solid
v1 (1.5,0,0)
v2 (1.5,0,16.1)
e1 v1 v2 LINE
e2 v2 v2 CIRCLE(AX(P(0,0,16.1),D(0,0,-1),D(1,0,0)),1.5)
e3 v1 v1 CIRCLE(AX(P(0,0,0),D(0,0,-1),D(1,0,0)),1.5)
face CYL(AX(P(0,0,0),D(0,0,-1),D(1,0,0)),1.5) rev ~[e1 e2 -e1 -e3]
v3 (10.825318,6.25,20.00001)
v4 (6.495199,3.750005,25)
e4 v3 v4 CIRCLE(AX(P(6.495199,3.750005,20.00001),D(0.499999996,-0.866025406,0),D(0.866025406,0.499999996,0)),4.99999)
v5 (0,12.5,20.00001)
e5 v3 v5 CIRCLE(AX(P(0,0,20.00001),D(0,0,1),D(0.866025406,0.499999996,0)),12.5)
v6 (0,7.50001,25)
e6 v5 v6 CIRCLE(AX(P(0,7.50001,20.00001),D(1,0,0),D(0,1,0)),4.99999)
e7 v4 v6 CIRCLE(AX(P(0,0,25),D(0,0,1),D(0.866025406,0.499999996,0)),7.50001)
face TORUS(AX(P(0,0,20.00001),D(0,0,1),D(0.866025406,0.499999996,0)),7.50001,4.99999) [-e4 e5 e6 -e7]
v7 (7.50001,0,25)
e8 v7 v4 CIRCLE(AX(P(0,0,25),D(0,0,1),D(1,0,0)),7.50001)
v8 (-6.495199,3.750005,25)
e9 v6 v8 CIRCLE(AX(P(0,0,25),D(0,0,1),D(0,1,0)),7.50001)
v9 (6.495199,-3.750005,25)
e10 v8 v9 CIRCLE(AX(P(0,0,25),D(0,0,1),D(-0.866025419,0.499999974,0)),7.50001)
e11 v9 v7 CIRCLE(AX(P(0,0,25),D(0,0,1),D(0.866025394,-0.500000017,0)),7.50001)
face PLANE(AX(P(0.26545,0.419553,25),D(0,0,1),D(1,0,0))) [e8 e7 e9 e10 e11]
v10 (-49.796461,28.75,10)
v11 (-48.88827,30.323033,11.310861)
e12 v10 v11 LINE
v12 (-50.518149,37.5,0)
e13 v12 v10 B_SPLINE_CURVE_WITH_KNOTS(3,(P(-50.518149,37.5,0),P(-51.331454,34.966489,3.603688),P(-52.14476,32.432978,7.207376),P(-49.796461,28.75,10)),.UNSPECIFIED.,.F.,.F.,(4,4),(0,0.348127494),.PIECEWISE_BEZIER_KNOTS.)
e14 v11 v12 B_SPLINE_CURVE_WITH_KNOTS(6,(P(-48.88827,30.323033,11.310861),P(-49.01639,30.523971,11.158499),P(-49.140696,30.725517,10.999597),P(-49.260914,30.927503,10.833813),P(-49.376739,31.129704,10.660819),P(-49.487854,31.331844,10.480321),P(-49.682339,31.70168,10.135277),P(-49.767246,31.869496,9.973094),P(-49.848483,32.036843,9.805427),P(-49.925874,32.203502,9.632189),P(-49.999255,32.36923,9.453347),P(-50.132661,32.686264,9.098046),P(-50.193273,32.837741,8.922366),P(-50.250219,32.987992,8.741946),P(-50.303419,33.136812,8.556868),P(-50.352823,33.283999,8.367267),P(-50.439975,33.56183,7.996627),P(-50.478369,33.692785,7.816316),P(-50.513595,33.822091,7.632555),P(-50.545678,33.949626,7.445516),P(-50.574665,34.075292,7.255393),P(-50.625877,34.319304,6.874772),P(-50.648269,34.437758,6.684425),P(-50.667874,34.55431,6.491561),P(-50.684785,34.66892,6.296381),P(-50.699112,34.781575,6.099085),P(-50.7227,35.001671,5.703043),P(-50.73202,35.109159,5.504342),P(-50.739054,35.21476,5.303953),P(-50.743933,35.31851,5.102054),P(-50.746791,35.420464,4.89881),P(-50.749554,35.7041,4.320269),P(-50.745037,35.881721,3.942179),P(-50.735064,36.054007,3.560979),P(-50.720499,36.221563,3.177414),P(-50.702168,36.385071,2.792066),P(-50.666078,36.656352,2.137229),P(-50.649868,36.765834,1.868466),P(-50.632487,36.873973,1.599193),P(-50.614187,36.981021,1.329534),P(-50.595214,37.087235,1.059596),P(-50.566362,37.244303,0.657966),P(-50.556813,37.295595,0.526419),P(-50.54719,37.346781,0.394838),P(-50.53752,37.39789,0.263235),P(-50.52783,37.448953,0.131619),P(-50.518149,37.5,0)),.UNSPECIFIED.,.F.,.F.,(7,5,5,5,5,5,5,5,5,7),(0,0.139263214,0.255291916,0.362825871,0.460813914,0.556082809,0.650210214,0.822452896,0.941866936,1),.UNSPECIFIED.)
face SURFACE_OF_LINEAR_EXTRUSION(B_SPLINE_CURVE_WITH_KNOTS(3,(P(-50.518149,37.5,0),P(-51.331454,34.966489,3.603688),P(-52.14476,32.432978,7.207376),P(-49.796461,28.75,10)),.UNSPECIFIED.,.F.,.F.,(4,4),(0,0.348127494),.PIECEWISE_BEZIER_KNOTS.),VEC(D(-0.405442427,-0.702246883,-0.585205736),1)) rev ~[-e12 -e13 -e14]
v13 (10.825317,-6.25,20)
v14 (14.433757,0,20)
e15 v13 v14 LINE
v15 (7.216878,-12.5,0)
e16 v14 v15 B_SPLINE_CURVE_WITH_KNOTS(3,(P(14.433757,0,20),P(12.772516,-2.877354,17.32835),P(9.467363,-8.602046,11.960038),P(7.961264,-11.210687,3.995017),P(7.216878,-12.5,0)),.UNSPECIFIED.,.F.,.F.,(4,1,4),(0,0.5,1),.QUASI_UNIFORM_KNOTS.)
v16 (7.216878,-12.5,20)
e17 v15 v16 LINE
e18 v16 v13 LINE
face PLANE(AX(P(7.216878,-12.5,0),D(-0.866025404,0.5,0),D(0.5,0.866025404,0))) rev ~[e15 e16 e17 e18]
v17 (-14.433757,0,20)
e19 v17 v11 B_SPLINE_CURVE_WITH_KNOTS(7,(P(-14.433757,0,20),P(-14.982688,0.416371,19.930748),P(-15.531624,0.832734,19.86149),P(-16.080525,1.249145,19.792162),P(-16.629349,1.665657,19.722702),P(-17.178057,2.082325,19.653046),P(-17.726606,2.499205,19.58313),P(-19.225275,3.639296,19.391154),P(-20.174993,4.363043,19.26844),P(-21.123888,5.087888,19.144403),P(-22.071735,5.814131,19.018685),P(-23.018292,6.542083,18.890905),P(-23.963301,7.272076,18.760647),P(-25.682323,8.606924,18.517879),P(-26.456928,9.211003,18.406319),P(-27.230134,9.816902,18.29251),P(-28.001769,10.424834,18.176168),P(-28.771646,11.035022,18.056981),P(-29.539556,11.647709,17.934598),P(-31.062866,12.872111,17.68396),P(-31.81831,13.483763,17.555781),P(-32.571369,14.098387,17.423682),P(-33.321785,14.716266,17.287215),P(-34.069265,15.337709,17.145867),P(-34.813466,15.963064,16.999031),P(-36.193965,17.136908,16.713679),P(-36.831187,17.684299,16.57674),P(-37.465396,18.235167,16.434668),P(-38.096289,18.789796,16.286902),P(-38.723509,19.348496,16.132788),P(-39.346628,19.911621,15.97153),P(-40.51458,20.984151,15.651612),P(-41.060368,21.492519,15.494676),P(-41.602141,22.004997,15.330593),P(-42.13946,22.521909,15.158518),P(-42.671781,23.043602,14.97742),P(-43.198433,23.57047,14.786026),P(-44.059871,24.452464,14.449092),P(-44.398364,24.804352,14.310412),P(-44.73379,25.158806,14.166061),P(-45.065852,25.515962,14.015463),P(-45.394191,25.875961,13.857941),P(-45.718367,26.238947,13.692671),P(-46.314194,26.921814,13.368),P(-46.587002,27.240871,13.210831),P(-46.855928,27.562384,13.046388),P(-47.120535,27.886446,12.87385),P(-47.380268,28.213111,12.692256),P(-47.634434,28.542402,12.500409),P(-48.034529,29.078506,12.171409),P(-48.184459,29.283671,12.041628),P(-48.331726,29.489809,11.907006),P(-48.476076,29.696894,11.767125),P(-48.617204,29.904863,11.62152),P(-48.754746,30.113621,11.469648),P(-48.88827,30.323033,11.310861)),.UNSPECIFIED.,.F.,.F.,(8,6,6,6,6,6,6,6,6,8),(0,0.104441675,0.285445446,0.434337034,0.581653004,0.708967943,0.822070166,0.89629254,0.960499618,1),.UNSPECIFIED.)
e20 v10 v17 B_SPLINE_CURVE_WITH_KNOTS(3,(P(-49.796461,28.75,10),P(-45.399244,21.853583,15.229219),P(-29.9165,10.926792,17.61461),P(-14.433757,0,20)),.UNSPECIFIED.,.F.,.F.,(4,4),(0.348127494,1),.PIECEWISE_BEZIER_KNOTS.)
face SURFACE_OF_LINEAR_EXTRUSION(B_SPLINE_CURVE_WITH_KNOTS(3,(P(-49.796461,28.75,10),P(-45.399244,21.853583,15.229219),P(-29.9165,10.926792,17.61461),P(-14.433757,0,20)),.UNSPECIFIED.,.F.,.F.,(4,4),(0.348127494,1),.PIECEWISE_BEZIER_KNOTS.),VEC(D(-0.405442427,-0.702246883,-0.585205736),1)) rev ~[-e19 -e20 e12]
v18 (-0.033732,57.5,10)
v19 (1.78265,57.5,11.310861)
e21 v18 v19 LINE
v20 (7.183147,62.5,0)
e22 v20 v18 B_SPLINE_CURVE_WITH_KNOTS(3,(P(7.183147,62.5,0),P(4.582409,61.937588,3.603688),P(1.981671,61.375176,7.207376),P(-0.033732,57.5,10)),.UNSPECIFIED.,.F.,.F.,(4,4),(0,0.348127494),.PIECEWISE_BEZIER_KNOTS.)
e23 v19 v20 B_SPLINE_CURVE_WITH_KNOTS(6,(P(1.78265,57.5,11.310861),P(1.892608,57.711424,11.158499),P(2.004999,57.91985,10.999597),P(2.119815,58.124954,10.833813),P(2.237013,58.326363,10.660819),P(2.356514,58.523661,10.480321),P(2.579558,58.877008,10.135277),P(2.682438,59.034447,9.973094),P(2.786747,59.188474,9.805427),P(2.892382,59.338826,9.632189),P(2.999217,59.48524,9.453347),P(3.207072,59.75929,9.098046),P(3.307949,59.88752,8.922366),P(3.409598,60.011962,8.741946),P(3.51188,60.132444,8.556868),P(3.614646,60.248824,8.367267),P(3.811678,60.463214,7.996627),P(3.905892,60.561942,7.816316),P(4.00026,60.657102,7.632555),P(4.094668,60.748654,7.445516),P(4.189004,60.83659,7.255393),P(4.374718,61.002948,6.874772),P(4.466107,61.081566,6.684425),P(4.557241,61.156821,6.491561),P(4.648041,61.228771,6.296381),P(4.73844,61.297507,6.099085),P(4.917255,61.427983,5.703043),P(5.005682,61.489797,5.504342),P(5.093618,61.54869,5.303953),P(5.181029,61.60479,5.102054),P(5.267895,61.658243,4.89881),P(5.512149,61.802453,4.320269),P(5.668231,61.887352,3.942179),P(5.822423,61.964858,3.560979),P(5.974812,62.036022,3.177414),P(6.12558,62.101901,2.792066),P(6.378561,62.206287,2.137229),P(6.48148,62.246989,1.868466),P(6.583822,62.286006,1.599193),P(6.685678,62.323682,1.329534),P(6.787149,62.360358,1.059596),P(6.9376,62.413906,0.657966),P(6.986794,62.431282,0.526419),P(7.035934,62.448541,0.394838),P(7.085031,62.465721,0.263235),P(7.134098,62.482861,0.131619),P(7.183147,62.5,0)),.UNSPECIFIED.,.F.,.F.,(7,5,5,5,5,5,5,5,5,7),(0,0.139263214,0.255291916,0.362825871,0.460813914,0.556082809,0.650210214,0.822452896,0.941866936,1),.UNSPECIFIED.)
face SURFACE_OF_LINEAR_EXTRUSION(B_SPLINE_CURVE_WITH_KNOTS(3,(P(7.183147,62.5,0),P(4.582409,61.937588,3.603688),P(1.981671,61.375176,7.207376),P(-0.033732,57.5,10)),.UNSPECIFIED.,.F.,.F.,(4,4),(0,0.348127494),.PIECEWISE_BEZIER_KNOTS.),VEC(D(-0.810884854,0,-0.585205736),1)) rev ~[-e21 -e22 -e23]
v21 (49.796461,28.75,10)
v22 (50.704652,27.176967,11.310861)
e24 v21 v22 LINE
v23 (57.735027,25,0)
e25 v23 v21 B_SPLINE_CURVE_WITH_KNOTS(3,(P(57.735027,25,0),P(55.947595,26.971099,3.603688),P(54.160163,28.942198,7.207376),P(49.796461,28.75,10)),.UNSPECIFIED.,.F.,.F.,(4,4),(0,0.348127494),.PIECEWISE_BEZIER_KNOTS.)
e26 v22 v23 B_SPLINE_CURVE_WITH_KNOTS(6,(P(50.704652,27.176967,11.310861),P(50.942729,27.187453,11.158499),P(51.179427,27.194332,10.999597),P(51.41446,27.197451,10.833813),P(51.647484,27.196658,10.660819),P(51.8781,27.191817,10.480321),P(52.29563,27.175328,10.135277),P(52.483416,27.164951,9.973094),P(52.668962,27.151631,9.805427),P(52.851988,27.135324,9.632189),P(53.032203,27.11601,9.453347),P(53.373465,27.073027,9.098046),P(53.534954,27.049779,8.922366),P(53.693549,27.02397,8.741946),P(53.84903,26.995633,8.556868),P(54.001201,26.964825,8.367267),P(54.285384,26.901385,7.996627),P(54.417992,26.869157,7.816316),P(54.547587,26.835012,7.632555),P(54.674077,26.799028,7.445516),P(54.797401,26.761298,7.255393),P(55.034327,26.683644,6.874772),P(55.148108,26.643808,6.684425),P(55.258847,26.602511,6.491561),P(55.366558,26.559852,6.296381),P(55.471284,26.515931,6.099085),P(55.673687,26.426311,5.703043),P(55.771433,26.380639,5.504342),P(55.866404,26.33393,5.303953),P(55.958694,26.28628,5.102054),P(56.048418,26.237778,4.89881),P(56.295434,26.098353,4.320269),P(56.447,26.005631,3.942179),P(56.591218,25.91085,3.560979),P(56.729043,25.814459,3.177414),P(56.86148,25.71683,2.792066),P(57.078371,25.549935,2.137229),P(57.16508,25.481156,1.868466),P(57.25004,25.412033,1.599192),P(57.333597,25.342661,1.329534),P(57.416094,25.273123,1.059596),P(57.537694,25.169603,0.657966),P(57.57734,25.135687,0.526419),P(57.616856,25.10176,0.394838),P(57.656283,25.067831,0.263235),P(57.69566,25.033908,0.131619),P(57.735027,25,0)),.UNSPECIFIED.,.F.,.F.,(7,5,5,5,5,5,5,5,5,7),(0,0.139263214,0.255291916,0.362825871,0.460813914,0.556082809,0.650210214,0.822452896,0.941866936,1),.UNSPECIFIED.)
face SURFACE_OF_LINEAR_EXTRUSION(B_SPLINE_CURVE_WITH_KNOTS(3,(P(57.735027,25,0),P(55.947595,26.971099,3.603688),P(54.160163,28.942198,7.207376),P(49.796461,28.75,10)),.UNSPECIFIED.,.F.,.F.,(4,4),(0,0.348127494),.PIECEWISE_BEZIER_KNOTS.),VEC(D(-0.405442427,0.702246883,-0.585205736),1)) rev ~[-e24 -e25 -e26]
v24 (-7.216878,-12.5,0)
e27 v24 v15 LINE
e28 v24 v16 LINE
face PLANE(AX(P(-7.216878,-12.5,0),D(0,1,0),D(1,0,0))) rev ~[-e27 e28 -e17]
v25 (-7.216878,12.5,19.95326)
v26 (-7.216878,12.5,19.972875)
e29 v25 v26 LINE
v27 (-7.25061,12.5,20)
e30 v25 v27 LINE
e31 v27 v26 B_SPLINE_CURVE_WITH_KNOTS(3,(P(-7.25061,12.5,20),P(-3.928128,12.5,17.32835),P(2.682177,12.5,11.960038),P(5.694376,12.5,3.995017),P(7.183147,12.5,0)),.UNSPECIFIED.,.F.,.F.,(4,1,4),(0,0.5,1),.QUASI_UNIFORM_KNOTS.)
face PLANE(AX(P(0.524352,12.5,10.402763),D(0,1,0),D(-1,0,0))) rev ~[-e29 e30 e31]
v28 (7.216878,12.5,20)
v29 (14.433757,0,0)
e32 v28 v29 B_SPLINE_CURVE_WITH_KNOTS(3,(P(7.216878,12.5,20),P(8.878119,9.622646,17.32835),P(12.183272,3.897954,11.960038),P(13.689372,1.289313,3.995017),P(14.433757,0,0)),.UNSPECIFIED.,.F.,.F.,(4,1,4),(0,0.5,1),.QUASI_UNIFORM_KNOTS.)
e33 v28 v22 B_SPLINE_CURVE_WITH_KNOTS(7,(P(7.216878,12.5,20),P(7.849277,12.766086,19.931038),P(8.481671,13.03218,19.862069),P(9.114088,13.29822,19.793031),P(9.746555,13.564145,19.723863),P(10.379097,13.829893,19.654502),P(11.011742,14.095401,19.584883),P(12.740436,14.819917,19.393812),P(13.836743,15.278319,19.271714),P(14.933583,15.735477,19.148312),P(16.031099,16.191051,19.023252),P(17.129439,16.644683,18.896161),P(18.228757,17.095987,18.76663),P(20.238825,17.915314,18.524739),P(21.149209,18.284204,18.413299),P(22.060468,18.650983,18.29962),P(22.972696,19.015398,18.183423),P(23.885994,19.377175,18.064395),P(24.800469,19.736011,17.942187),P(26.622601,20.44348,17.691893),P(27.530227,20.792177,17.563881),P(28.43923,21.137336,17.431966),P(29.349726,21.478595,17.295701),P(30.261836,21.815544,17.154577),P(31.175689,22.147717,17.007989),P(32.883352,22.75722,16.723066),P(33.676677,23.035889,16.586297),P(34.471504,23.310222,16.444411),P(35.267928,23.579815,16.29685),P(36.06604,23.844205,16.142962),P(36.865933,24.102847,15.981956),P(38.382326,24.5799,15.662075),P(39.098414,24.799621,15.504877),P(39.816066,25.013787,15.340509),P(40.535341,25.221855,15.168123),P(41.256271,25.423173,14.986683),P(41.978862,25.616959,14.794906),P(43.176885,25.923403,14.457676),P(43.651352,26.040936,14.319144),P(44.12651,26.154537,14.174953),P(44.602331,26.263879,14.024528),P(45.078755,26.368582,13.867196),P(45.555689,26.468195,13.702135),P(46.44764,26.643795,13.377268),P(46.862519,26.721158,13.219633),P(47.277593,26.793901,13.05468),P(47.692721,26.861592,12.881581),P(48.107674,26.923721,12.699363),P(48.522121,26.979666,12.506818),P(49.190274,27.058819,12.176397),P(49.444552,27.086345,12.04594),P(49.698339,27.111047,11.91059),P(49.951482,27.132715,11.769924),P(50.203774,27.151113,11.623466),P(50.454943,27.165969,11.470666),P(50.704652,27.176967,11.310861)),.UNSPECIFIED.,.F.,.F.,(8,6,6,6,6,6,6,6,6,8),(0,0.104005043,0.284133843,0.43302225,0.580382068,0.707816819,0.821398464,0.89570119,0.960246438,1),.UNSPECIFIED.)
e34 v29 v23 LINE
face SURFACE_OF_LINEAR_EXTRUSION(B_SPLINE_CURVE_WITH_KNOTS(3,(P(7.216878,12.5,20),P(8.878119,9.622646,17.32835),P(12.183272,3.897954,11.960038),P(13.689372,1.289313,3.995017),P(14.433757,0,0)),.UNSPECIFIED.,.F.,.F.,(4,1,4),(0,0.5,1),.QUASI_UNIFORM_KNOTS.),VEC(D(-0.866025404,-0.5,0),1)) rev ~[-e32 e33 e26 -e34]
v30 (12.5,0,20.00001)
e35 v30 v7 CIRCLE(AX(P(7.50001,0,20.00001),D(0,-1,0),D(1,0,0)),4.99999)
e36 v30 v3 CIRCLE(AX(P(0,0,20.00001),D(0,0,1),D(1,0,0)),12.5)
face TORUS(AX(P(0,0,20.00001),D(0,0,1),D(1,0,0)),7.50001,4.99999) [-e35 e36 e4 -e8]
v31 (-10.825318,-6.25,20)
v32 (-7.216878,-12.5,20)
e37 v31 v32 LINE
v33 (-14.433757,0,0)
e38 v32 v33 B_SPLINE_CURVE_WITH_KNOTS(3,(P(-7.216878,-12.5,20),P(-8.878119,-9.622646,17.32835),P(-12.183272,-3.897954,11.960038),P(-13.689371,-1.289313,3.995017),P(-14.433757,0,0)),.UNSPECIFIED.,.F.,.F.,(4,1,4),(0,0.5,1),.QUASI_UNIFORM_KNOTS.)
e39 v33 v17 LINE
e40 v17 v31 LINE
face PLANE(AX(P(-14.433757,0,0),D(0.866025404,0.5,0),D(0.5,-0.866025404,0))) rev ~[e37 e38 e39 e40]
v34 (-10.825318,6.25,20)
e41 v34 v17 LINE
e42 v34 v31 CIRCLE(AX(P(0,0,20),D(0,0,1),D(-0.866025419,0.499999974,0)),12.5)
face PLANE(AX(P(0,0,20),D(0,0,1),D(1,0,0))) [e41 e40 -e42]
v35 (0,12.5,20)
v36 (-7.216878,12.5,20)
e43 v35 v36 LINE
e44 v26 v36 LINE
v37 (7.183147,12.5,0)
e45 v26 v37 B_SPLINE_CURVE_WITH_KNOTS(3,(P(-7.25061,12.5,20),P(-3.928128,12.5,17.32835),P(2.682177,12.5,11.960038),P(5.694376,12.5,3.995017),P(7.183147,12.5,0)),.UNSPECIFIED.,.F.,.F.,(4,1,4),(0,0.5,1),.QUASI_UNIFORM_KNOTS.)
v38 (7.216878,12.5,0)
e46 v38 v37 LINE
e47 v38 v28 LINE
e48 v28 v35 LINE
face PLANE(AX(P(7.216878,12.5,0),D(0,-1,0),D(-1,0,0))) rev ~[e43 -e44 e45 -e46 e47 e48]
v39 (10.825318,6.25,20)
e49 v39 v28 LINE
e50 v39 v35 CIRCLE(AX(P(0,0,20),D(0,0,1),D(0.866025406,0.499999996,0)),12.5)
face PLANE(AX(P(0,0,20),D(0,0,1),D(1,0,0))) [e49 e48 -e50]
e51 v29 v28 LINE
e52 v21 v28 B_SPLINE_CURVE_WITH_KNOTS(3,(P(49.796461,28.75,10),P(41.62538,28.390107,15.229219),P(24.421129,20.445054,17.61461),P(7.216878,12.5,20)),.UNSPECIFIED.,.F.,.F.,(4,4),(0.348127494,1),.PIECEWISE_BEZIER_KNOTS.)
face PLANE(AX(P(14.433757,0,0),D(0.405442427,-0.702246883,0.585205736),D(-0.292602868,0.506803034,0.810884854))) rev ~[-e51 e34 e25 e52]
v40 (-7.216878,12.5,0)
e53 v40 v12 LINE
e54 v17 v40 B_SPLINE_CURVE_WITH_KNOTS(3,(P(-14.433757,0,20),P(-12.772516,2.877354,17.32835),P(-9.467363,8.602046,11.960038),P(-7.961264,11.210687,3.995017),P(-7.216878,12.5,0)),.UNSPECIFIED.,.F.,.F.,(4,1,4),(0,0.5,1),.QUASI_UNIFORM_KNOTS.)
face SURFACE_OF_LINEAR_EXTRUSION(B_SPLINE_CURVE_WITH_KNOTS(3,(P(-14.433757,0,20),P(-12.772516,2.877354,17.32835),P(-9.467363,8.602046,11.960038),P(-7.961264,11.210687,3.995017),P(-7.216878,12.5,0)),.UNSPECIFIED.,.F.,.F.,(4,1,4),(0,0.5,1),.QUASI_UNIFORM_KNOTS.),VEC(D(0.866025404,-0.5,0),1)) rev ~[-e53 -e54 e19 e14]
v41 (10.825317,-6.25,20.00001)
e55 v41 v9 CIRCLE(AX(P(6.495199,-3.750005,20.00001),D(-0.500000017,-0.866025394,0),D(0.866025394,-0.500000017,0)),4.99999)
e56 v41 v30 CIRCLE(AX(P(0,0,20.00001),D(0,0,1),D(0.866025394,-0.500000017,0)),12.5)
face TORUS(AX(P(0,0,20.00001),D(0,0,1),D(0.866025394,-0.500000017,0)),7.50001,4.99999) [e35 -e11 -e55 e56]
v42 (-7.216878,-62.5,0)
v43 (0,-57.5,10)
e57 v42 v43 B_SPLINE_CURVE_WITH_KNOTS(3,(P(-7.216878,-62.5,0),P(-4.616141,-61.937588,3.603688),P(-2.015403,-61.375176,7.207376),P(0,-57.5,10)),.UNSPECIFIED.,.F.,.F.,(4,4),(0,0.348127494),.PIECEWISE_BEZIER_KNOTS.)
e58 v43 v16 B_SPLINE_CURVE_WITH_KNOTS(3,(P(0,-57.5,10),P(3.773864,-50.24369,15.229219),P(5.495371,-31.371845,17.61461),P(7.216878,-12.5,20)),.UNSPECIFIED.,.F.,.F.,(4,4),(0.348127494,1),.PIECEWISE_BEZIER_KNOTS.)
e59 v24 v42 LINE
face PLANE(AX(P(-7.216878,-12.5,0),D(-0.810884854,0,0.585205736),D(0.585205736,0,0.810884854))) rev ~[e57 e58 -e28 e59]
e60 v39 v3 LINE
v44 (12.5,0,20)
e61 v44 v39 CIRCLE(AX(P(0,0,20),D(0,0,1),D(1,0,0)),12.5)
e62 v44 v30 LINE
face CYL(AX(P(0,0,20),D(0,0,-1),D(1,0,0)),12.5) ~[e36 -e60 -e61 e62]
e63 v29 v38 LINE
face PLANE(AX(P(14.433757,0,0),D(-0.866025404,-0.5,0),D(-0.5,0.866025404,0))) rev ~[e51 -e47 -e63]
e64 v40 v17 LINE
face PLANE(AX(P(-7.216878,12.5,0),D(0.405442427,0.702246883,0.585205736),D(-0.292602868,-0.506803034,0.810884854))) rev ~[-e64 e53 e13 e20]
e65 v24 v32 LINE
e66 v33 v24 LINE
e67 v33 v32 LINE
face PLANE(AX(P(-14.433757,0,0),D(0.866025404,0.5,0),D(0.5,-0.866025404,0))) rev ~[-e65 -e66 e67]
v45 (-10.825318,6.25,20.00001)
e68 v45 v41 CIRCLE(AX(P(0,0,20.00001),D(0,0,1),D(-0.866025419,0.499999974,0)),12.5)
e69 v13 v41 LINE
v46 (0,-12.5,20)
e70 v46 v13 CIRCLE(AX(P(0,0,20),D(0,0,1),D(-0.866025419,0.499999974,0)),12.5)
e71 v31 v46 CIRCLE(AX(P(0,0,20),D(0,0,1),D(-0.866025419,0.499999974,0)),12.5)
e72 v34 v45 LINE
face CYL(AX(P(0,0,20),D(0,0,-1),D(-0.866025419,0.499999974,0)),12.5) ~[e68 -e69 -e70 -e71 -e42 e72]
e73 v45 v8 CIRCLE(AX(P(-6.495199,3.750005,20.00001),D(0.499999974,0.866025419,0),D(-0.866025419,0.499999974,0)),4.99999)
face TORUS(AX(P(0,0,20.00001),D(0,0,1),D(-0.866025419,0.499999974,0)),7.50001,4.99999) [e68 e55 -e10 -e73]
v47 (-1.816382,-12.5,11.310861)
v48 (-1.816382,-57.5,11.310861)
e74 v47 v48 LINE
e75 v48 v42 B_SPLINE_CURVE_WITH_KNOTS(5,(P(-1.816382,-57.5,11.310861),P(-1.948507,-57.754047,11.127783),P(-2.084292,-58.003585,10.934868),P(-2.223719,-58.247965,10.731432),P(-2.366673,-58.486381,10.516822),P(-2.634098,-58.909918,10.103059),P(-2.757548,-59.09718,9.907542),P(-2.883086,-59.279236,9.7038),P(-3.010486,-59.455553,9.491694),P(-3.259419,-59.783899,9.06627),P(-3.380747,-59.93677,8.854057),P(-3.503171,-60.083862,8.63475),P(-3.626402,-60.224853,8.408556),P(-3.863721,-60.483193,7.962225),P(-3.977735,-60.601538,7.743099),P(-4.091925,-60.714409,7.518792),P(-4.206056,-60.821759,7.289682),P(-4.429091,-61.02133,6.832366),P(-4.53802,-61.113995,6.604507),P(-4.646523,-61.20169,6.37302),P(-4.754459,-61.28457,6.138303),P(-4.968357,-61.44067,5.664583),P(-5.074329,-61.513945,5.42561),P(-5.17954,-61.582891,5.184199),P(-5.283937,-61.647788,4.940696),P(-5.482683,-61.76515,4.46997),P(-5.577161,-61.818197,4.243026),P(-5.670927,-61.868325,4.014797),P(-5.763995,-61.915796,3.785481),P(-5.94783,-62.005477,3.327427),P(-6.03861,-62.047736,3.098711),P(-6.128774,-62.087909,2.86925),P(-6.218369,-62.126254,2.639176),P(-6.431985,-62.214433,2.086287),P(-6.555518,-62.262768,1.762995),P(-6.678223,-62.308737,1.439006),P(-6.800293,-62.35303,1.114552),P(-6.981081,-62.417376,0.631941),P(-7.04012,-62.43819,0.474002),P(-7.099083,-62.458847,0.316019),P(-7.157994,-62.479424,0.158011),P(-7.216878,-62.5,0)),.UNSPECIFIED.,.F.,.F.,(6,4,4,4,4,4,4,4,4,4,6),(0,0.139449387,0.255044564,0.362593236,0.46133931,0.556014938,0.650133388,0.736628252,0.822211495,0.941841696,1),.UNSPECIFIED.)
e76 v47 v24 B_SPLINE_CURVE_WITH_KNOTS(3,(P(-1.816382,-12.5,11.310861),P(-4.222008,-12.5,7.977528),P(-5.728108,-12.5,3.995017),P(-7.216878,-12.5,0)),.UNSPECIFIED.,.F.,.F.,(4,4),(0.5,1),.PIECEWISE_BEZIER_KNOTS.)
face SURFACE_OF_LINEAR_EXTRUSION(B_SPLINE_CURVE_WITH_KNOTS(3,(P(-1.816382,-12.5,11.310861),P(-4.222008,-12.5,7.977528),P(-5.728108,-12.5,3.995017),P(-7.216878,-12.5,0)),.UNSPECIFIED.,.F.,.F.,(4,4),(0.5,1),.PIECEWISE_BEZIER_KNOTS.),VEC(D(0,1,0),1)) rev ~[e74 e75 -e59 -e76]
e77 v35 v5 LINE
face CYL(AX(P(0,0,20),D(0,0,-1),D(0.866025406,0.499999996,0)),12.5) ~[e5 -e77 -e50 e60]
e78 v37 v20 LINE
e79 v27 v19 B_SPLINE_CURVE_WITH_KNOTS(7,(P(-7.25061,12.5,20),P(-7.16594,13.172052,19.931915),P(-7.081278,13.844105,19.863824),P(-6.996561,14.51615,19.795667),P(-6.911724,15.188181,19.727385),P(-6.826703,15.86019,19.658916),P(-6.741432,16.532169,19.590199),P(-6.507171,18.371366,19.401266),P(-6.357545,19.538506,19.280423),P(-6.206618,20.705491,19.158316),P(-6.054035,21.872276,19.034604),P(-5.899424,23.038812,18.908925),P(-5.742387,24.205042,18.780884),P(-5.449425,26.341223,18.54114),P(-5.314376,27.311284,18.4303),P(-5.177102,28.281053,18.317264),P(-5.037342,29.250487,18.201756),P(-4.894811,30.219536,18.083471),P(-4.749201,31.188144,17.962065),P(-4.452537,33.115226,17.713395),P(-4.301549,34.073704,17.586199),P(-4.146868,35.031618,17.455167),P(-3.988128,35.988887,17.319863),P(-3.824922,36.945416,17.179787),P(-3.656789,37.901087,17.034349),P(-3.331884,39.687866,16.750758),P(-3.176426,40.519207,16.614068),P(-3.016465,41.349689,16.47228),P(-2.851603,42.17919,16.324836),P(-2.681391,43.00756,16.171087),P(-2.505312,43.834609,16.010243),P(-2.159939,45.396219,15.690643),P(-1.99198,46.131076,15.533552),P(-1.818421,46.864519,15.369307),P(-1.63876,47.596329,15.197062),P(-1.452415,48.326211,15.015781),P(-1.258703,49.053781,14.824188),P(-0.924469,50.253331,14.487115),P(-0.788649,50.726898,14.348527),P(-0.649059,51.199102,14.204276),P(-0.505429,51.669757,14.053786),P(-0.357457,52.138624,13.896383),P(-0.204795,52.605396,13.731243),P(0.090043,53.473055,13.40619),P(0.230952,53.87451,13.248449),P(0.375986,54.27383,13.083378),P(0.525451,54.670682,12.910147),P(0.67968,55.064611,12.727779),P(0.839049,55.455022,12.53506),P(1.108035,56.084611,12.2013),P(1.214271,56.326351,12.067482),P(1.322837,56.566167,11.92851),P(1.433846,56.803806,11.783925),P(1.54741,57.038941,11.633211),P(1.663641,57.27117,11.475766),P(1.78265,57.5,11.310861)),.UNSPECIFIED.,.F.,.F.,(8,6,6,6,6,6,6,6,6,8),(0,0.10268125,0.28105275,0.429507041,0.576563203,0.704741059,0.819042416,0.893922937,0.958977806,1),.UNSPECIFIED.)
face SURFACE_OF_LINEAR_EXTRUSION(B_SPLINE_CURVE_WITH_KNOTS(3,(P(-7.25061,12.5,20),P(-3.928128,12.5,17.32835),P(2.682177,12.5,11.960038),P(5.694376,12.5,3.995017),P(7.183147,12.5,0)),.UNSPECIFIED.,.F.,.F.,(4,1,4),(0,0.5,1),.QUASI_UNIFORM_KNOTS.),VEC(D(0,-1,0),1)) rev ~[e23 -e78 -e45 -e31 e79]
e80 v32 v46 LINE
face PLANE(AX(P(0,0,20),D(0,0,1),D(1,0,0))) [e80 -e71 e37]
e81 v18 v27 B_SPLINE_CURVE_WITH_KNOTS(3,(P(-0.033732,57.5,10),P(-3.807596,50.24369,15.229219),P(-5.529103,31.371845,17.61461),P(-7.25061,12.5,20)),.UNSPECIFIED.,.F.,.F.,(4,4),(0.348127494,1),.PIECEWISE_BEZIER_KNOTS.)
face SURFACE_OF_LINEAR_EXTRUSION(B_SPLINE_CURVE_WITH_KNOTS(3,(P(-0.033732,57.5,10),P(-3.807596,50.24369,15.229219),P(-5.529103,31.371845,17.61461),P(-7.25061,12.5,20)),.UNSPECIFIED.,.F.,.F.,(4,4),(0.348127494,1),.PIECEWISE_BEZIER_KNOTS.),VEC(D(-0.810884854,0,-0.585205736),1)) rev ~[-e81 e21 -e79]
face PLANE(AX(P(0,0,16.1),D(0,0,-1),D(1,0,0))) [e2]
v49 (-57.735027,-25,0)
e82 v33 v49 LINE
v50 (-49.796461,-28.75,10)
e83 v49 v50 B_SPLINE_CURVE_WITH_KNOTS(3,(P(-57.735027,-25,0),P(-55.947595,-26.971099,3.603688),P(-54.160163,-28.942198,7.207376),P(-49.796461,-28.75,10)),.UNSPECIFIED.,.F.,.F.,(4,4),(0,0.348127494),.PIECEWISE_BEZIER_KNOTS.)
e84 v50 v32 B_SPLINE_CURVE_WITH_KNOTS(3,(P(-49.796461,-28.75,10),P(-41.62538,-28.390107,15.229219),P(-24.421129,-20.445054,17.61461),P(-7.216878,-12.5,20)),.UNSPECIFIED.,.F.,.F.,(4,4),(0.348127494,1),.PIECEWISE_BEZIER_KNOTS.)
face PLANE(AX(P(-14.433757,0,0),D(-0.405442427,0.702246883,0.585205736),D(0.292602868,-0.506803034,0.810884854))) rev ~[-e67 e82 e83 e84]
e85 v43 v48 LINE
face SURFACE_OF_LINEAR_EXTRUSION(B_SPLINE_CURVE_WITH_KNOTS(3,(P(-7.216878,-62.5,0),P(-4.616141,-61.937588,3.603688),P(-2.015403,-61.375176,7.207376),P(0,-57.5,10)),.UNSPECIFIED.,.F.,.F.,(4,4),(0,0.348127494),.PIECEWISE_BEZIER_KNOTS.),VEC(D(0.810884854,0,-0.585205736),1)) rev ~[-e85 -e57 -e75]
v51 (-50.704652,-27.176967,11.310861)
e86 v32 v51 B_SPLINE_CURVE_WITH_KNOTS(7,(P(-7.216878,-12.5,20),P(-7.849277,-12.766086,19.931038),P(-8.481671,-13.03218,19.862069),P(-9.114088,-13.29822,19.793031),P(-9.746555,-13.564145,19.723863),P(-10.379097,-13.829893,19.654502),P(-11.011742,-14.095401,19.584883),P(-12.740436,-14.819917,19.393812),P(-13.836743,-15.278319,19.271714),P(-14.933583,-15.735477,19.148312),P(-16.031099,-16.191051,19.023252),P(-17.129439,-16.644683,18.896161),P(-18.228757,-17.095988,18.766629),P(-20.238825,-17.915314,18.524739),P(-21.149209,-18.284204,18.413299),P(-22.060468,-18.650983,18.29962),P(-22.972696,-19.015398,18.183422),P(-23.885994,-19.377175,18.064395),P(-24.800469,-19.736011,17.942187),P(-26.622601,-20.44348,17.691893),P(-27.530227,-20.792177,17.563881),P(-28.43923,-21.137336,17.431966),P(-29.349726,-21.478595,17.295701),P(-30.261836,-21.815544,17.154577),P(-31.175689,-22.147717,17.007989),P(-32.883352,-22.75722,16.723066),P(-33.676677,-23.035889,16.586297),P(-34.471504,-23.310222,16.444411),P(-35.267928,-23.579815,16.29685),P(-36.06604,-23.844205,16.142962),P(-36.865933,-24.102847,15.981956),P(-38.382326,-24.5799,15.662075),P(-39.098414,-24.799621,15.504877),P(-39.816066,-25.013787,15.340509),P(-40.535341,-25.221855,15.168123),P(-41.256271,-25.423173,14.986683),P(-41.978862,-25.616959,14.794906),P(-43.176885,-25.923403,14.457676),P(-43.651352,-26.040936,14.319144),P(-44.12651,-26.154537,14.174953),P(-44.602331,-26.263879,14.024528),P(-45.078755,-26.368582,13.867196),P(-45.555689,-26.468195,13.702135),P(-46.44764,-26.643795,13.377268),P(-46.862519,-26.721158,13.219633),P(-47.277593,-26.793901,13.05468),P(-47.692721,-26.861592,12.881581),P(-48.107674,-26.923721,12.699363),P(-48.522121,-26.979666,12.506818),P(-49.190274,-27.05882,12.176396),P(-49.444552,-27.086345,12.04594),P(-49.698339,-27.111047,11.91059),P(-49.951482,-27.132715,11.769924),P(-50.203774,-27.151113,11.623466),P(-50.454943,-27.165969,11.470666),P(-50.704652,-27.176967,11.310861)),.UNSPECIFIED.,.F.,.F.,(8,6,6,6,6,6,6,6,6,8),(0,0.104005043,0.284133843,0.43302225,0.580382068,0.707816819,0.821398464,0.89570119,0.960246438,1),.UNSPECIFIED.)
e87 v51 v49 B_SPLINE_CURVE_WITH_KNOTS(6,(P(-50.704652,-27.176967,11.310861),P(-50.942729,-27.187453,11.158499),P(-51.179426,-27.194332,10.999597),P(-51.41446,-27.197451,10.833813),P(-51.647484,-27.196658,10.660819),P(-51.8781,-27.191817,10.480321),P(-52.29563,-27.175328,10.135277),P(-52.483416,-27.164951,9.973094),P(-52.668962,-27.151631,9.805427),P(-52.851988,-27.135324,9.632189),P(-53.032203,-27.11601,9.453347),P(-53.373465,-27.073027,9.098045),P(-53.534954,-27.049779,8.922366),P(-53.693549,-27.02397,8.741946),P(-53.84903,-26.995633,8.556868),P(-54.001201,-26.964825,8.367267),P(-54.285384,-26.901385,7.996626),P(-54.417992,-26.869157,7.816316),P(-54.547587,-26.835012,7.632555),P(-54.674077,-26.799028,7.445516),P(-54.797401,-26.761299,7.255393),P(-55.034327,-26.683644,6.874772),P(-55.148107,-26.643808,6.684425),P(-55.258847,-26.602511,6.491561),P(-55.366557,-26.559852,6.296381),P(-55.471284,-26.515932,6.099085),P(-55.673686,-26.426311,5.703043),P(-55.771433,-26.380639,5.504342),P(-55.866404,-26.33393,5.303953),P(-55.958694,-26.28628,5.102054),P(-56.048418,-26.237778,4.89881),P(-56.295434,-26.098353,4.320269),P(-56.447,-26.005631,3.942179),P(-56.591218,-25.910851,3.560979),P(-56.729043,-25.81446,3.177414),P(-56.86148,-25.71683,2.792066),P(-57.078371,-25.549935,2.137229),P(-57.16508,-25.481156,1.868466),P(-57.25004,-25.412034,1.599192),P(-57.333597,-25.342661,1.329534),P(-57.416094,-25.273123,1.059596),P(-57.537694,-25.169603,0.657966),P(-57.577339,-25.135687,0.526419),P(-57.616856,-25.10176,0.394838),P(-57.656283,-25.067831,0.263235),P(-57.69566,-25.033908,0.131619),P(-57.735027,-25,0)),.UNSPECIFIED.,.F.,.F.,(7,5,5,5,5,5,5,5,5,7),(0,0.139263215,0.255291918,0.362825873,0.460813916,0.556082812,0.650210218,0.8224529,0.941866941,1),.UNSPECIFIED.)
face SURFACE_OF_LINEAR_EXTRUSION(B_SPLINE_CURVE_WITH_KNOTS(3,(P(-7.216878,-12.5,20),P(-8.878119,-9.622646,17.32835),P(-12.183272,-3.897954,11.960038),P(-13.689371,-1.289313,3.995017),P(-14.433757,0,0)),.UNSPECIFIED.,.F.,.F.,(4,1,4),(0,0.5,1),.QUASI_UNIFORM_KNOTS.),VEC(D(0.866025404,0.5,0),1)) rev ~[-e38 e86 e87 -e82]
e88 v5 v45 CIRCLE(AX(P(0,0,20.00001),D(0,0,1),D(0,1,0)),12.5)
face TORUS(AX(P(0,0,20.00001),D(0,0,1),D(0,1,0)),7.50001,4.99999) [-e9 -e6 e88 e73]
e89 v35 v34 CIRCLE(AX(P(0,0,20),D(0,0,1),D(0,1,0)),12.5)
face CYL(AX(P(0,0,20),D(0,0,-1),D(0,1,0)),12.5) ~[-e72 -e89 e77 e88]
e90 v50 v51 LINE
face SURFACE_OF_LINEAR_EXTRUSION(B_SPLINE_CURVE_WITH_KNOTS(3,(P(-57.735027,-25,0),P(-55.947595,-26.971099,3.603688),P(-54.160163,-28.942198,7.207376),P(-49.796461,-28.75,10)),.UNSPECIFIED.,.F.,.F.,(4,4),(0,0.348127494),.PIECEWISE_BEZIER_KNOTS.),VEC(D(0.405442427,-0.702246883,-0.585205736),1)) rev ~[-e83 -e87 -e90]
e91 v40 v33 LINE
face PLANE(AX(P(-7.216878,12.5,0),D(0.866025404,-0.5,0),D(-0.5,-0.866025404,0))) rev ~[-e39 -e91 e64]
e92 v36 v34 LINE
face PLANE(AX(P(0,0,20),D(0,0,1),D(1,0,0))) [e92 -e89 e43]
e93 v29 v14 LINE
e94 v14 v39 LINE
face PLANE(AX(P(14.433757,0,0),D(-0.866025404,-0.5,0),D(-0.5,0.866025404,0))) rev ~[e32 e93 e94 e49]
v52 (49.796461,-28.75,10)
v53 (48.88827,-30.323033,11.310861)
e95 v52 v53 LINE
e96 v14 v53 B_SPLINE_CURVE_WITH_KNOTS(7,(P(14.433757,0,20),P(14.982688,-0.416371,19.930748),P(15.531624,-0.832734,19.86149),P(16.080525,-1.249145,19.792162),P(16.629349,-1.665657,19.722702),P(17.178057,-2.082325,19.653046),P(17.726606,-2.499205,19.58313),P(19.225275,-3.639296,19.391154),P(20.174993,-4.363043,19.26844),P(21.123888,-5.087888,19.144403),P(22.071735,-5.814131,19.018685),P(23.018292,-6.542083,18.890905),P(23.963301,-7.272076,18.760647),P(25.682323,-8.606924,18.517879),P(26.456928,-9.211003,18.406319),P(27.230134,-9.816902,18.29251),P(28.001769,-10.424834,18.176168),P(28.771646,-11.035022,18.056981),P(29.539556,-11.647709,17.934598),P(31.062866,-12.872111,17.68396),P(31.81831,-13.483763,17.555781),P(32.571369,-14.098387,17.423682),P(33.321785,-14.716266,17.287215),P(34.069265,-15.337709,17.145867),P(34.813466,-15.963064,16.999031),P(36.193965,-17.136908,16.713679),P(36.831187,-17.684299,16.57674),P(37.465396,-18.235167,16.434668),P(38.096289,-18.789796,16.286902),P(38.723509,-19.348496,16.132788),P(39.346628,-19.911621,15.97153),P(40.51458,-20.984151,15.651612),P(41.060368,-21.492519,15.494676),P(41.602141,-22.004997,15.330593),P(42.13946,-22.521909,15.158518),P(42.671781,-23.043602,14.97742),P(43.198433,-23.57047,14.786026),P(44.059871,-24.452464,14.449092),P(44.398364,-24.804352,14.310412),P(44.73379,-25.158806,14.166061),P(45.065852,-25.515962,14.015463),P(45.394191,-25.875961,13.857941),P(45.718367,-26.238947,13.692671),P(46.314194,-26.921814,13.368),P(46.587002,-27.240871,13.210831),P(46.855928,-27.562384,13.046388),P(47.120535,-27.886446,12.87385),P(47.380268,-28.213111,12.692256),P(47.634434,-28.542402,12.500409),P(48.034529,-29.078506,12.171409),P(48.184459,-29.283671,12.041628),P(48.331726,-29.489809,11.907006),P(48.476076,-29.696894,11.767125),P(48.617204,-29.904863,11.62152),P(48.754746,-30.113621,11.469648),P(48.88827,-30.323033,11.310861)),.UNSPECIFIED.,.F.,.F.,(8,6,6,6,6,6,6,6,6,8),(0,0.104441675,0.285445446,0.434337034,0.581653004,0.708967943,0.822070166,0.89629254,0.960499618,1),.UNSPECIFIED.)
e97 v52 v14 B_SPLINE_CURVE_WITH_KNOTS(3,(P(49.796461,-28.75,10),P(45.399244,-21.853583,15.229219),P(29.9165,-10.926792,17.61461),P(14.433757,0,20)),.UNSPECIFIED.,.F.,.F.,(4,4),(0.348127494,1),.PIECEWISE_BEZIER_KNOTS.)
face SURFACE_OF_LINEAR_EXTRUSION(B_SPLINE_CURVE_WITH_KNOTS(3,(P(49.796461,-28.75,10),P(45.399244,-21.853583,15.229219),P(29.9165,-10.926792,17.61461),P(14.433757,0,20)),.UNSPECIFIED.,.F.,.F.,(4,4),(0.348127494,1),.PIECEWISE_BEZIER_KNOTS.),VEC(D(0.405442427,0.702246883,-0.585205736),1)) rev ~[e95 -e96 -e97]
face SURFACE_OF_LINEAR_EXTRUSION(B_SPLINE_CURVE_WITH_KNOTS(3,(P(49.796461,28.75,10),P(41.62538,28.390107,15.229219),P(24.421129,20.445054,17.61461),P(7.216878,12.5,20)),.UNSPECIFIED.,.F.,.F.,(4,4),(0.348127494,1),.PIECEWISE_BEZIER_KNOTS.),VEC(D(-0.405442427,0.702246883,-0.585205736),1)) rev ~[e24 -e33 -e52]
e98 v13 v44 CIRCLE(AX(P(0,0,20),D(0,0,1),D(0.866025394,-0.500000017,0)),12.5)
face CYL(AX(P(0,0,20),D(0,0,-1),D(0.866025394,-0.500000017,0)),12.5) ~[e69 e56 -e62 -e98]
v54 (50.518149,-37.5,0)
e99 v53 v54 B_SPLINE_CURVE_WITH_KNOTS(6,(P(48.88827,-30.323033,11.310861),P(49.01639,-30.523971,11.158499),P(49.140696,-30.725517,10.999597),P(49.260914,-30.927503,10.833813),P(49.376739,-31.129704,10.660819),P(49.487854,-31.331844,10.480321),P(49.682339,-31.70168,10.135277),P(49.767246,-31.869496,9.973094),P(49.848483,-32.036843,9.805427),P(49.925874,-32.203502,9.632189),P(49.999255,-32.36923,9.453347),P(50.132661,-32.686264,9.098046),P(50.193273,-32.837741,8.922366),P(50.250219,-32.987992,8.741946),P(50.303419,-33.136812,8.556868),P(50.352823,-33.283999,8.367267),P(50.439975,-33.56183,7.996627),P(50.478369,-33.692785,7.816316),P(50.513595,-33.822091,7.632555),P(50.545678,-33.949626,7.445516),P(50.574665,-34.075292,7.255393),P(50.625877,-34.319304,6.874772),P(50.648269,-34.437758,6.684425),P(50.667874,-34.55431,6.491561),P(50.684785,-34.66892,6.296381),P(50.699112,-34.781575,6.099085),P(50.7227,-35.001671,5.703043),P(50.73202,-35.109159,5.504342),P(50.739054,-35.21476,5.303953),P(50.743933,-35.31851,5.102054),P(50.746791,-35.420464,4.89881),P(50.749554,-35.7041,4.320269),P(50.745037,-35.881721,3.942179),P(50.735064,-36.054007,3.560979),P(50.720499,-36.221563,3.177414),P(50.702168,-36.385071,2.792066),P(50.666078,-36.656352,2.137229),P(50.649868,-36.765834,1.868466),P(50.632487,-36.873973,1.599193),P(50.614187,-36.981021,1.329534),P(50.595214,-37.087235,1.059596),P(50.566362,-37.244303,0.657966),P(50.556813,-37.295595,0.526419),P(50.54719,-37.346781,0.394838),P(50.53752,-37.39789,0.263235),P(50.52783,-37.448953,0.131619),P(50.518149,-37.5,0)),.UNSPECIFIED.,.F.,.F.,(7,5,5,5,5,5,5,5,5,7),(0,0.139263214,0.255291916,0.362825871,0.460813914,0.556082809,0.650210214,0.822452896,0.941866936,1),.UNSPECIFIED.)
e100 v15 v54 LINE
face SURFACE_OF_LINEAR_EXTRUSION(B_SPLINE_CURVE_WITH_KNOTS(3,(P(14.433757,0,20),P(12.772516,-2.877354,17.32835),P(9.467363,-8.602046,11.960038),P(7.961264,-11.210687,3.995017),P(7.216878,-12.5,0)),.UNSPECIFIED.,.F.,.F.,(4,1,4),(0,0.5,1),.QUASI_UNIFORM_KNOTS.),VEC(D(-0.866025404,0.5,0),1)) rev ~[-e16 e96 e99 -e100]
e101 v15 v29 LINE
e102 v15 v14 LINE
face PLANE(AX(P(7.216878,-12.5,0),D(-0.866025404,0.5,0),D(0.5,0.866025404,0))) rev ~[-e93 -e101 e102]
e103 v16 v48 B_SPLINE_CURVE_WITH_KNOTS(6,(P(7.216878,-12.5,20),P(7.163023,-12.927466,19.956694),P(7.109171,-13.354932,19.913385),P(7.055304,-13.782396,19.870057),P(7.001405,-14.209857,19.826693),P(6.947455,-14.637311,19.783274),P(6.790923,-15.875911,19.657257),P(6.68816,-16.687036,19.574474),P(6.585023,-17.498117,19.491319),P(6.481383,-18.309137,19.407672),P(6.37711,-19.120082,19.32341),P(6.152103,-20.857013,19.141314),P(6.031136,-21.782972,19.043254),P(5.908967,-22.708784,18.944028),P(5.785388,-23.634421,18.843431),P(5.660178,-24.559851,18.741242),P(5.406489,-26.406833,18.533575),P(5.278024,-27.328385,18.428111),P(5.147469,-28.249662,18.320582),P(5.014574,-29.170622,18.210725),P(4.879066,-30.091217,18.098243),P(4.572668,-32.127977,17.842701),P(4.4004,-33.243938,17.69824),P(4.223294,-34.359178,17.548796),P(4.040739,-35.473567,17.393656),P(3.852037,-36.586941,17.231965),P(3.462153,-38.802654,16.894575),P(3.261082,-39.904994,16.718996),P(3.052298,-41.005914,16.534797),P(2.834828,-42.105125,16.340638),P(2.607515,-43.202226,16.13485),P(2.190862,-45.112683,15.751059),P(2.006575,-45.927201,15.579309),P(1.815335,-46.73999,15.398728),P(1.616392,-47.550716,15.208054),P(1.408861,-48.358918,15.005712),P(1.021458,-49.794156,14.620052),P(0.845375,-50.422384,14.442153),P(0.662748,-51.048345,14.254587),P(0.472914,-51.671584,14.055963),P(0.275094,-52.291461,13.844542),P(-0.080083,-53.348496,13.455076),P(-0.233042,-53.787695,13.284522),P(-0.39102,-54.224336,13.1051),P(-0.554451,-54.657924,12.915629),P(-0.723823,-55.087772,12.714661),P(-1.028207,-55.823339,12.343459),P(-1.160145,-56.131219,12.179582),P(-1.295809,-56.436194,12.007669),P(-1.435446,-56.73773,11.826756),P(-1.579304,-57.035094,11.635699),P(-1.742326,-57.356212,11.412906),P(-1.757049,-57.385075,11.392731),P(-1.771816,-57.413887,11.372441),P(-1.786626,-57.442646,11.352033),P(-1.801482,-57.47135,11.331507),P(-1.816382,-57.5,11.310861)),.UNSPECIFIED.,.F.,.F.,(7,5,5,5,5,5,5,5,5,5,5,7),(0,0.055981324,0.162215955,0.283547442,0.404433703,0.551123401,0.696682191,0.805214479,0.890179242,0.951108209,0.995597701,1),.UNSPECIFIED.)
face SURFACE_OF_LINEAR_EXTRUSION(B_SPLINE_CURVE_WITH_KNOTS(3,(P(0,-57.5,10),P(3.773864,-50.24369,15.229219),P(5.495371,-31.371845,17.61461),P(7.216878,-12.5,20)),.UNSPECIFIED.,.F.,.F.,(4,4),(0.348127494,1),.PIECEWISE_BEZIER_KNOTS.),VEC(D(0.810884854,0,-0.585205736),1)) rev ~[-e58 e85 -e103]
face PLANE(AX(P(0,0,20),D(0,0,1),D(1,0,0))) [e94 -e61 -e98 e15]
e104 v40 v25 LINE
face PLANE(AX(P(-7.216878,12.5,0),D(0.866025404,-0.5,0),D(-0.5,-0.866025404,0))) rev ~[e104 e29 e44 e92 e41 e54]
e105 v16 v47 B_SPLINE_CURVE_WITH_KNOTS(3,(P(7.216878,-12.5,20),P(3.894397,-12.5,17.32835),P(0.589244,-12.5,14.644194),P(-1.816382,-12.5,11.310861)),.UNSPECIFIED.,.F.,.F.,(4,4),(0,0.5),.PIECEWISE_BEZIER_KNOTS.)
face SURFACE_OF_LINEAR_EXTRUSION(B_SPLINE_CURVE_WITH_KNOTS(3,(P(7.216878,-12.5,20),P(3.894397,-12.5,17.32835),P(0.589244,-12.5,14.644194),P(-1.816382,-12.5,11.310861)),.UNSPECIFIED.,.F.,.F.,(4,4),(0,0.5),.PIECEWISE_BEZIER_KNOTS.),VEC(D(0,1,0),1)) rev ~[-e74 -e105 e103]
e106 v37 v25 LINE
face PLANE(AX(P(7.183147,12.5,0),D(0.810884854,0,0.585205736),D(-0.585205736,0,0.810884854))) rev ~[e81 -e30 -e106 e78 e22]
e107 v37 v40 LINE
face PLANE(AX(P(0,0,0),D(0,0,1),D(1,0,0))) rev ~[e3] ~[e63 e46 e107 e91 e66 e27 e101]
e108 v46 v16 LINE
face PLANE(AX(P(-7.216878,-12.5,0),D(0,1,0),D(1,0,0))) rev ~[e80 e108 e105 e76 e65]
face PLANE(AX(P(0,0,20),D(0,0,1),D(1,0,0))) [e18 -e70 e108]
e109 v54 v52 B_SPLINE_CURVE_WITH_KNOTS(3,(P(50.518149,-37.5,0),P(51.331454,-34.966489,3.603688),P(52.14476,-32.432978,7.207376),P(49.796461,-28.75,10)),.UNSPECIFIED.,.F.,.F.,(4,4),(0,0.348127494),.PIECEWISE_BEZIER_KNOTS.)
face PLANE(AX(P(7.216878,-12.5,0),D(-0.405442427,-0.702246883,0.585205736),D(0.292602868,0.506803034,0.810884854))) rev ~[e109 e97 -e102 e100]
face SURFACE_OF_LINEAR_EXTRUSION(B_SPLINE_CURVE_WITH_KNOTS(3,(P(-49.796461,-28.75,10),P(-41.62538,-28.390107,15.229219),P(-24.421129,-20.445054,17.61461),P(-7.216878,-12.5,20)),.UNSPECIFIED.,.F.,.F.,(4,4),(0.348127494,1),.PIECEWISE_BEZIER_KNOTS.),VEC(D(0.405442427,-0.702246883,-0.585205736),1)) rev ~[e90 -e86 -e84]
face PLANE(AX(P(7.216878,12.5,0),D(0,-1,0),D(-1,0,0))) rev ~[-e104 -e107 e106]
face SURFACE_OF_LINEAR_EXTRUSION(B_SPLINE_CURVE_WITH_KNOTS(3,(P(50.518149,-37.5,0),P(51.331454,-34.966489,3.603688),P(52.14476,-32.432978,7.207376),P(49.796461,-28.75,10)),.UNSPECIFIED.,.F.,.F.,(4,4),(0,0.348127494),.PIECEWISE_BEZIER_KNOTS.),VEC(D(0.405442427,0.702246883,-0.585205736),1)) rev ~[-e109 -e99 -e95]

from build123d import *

# Parameters (mm, degrees)
F1_DEPTH  = 20
F3_DEPTH  = 50
F5_DEPTH  = 50
F7_DEPTH  = 50
F9_DEPTH  = 50
F11_DEPTH = 50
F13_DEPTH = 50
F15_DEPTH = 25
F17_DEPTH = 25
F19_DEPTH = 25
F21_DEPTH = 25
F23_DEPTH = 25
F25_DEPTH = 25
F27_DEPTH = 5
F28_R     = 4.99999
F29_R     = 1.5
F30_DEPTH = 16.1


# Not quite as in the source:
# - a fillet or chamfer is up to 0.001 mm smaller than in the source, because OpenCascade refuses the exact size


with BuildPart() as f1:
    # F0 (on Top) → F1 (new body)
    with BuildSketch(Plane.XY):
        Polygon((-7.2168783649, 12.5), (-14.4337567297, 0), (-7.2168783649, -12.5), (7.2168783649, -12.5), (14.4337567297, 0), (7.2168783649, 12.5), align=None)
    extrude(amount=F1_DEPTH)

    # F2 (on face) → F3 (join)
    with BuildSketch(Plane.XZ.offset(12.5)):
        with BuildLine():
            Line((0, 10), (7.2168783649, 20))
            add(Edge.make_bspline(
                [(7.2168783649, 20), (3.8943965132, 17.3283502948), (0.5892440485, 14.6441941819), (-1.8163820731, 11.3108608486)],
                knots=[0, 0, 0, 0, 0.5, 0.5, 0.5, 0.5], degree=3))
            Line((-1.8163820731, 11.3108608486), (0, 10))
        make_face()
        with BuildLine():
            Line((-7.2168783649, 0), (0, 10))
            Line((0, 10), (-1.8163820731, 11.3108608486))
            add(Edge.make_bspline(
                [(-1.8163820731, 11.3108608486), (-4.2220081948, 7.9775275153), (-5.7281079733, 3.9950169615), (-7.2168783649, 0)],
                knots=[0.5, 0.5, 0.5, 0.5, 1, 1, 1, 1], degree=3))
        make_face()
    extrude(amount=F3_DEPTH)

    # F4 (on face) → F5 (join)
    with BuildSketch(Plane(origin=(10.8253175473, -6.25, 0), x_dir=(0.5, 0.8660254038, 0), z_dir=(0.8660254038, -0.5, 0))):
        with BuildLine():
            Line((-7.2168783649, 0), (7.2168783649, 20))
            add(Edge.make_bspline(
                [(7.2168783649, 20), (3.8943965132, 17.3283502948), (-2.7159084163, 11.960038069), (-5.7281079733, 3.9950169615), (-7.2168783649, 0)],
                knots=[0, 0, 0, 0, 0.5, 1, 1, 1, 1], degree=3))
        make_face()
    extrude(amount=F5_DEPTH)

    # F6 (on face) → F7 (join)
    with BuildSketch(Plane(origin=(10.8253175473, 6.25, 0), x_dir=(-0.5, 0.8660254038, 0), z_dir=(0.8660254038, 0.5, 0))):
        with BuildLine():
            Line((-7.2168783649, 0), (7.2168783649, 20))
            add(Edge.make_bspline(
                [(7.2168783649, 20), (3.8943965132, 17.3283502948), (-2.7159084163, 11.960038069), (-5.7281079733, 3.9950169615), (-7.2168783649, 0)],
                knots=[0, 0, 0, 0, 0.5, 1, 1, 1, 1], degree=3))
        make_face()
    extrude(amount=F7_DEPTH)

    # F8 (on face) → F9 (join)
    with BuildSketch(Plane(origin=(0, 12.5, 0), x_dir=(-1, 0, 0), z_dir=(0, 1, 0))):
        with BuildLine():
            Line((-7.183146663, 0), (7.2506100667, 20))
            add(Edge.make_bspline(
                [(7.2506100667, 20), (3.9281282151, 17.3283502948), (-2.6821767144, 11.960038069), (-5.6943762714, 3.9950169615), (-7.183146663, 0)],
                knots=[0, 0, 0, 0, 0.5, 1, 1, 1, 1], degree=3))
        make_face()
    extrude(amount=F9_DEPTH)

    # F10 (on face) → F11 (join)
    with BuildSketch(Plane(origin=(-10.8253175473, 6.25, 0), x_dir=(-0.5, -0.8660254038, 0), z_dir=(-0.8660254038, 0.5, 0))):
        with BuildLine():
            Line((-7.2168783649, 0), (7.2168783649, 20))
            add(Edge.make_bspline(
                [(7.2168783649, 20), (3.8943965132, 17.3283502948), (-2.7159084163, 11.960038069), (-5.7281079733, 3.9950169615), (-7.2168783649, 0)],
                knots=[0, 0, 0, 0, 0.5, 1, 1, 1, 1], degree=3))
        make_face()
    extrude(amount=F11_DEPTH)

    # F12 (on face) → F13 (join)
    with BuildSketch(Plane(origin=(-10.8253175473, -6.25, 0), x_dir=(0.5, -0.8660254038, 0), z_dir=(-0.8660254038, -0.5, 0))):
        with BuildLine():
            Line((-7.2168782353, 0), (7.2168784944, 20))
            add(Edge.make_bspline(
                [(7.2168784944, 20), (3.8943966428, 17.3283502948), (-2.7159082867, 11.960038069), (-5.7281078437, 3.9950169615), (-7.2168782353, 0)],
                knots=[0, 0, 0, 0, 0.5, 1, 1, 1, 1], degree=3))
        make_face()
    extrude(amount=F13_DEPTH)

    # F14 (on face) → F15 (cut)
    with BuildSketch(Plane(origin=(-2.3726722966, 4.1095889673, 3.4246574728), x_dir=(0.914120582, 0.3114695001, 0.2595579168), z_dir=(0.405442427, -0.7022468832, -0.585205736))):
        with BuildLine():
            Line((-52.6686272502, 39.3713406512), (-56.6160705917, 27.6879752855))
            Line((-56.6160705917, 27.6879752855), (-51.879138611, 26.0875142863))
            add(Edge.make_bspline(
                [(-51.879138611, 26.0875142863), (-42.9404048496, 29.8743142581), (-24.1198561583, 26.6205224229), (-5.299307467, 23.3667305878)],
                knots=[0.3481274936, 0.3481274936, 0.3481274936, 0.3481274936, 1, 1, 1, 1], degree=3))
            Line((-5.2993074428, 23.3667306596), (-52.6686272502, 39.3713406512))
        make_face()
        with BuildLine():
            Line((-51.879138611, 26.0875142863), (-56.6160705917, 27.6879752855))
            Line((-56.6160705917, 27.6879752855), (-60.5635138847, 16.0046100634))
            add(Edge.make_bspline(
                [(-60.563513909, 16.0046099916), (-58.608157235, 20.034906453), (-56.6528005609, 24.0652029143), (-51.879138611, 26.0875142863)],
                knots=[0, 0, 0, 0, 0.3481274936, 0.3481274936, 0.3481274936, 0.3481274936], degree=3))
        make_face()
    extrude(amount=-F15_DEPTH, mode=Mode.SUBTRACT)

    # F16 (on face) → F17 (cut)
    with BuildSketch(Plane(origin=(-4.7453446783, 0, 3.4246575342), x_dir=(0, 1, 0), z_dir=(0.8108848541, 0, -0.585205736))):
        with BuildLine():
            Line((-62.5, 20.4410556966), (-62.5, 8.1088485408))
            Line((-62.5, 8.1088485408), (-57.5, 8.1088485408))
            add(Edge.make_bspline(
                [(-57.5, 8.1088485408), (-50.2436903689, 14.5576302724), (-31.3718451845, 17.4993429845), (-12.5, 20.4410556966)],
                knots=[0.3481274936, 0.3481274936, 0.3481274936, 0.3481274936, 1, 1, 1, 1], degree=3))
            Line((-12.5, 20.4410556966), (-62.5, 20.4410556966))
        make_face()
        with BuildLine():
            Line((-57.5, 8.1088485408), (-62.5, 8.1088485408))
            Line((-62.5, 8.1088485408), (-62.5, -4.223358615))
            add(Edge.make_bspline(
                [(-62.5, -4.223358615), (-61.9375881477, 0.2207838442), (-61.3751762953, 4.6649263034), (-57.5, 8.1088485408)],
                knots=[0, 0, 0, 0, 0.3481274936, 0.3481274936, 0.3481274936, 0.3481274936], degree=3))
        make_face()
    extrude(amount=-F17_DEPTH, mode=Mode.SUBTRACT)

    # F18 (on face) → F19 (cut)
    with BuildSketch(Plane(origin=(-2.3726723391, -4.1095890411, 3.4246575342), x_dir=(-0.914120582, 0.3114695001, -0.2595579168), z_dir=(0.405442427, 0.7022468832, -0.585205736))):
        with BuildLine():
            Line((-65.7546722441, -0.6401843997), (-61.8072289268, -12.3235496935))
            Line((-61.8072289268, -12.3235496935), (-57.070296946, -10.7230886944))
            add(Edge.make_bspline(
                [(-57.070296946, -10.7230886944), (-52.259972646, -2.2909124977), (-35.3226625414, 6.5367565471), (-18.3853524367, 15.3644255919)],
                knots=[0.3481274936, 0.3481274936, 0.3481274936, 0.3481274936, 1, 1, 1, 1], degree=3))
            Line((-18.3853524367, 15.3644255919), (-65.7546722441, -0.6401843997))
        make_face()
        with BuildLine():
            Line((-57.070296946, -10.7230886944), (-61.8072289268, -12.3235496935))
            Line((-61.8072289268, -12.3235496935), (-57.8597856095, -24.0069149874))
            add(Edge.make_bspline(
                [(-57.8597856095, -24.0069149874), (-58.7494996077, -19.616571232), (-59.6392136059, -15.2262274766), (-57.070296946, -10.7230886944)],
                knots=[0, 0, 0, 0, 0.3481274936, 0.3481274936, 0.3481274936, 0.3481274936], degree=3))
        make_face()
    extrude(amount=-F19_DEPTH, mode=Mode.SUBTRACT)

    # F20 (on face) → F21 (cut)
    with BuildSketch(Plane(origin=(2.3726723391, -4.1095890411, 3.4246575342), x_dir=(-0.914120582, -0.3114695001, 0.2595579168), z_dir=(-0.405442427, 0.7022468832, -0.585205736))):
        with BuildLine():
            Line((-52.6686272744, 39.3713405794), (-56.6160705917, 27.6879752855))
            Line((-56.6160705917, 27.6879752855), (-51.879138611, 26.0875142863))
            add(Edge.make_bspline(
                [(-51.879138611, 26.0875142863), (-42.9404048496, 29.8743142581), (-24.1198561583, 26.6205224229), (-5.299307467, 23.3667305878)],
                knots=[0.3481274936, 0.3481274936, 0.3481274936, 0.3481274936, 1, 1, 1, 1], degree=3))
            Line((-5.299307467, 23.3667305878), (-52.6686272744, 39.3713405794))
        make_face()
        with BuildLine():
            Line((-51.879138611, 26.0875142863), (-56.6160705917, 27.6879752855))
            Line((-56.6160705917, 27.6879752855), (-60.563513909, 16.0046099916))
            add(Edge.make_bspline(
                [(-60.563513909, 16.0046099916), (-58.608157235, 20.034906453), (-56.6528005609, 24.0652029143), (-51.879138611, 26.0875142863)],
                knots=[0, 0, 0, 0, 0.3481274936, 0.3481274936, 0.3481274936, 0.3481274936], degree=3))
        make_face()
    extrude(amount=-F21_DEPTH, mode=Mode.SUBTRACT)

    # F22 (on face) → F23 (cut)
    with BuildSketch(Plane(origin=(4.7231649291, 0, 3.4086506791), x_dir=(0, -1, 0), z_dir=(-0.8108848541, 0, -0.585205736))):
        with BuildLine():
            Line((-62.5, 20.460795682), (-62.5, 8.1285885262))
            Line((-62.5, 8.1285885262), (-57.5, 8.1285885262))
            add(Edge.make_bspline(
                [(-57.5, 8.1285885262), (-50.2436903689, 14.5773702578), (-31.3718451845, 17.5190829699), (-12.5, 20.460795682)],
                knots=[0.3481274936, 0.3481274936, 0.3481274936, 0.3481274936, 1, 1, 1, 1], degree=3))
            Line((-12.5, 20.460795682), (-62.5, 20.460795682))
        make_face()
        with BuildLine():
            Line((-57.5, 8.1285885262), (-62.5, 8.1285885262))
            Line((-62.5, 8.1285885262), (-62.5, -4.2036186296))
            add(Edge.make_bspline(
                [(-62.5, -4.2036186296), (-61.9375881477, 0.2405238296), (-61.3751762953, 4.6846662888), (-57.5, 8.1285885262)],
                knots=[0, 0, 0, 0, 0.3481274936, 0.3481274936, 0.3481274936, 0.3481274936], degree=3))
        make_face()
    extrude(amount=-F23_DEPTH, mode=Mode.SUBTRACT)

    # F24 (on face) → F25 (cut)
    with BuildSketch(Plane(origin=(2.3726723391, 4.1095890411, 3.4246575342), x_dir=(0.914120582, -0.3114695001, -0.2595579168), z_dir=(-0.405442427, -0.7022468832, -0.585205736))):
        with BuildLine():
            Line((-65.7546722441, -0.6401843997), (-61.8072289268, -12.3235496935))
            Line((-61.8072289268, -12.3235496935), (-57.070296946, -10.7230886944))
            add(Edge.make_bspline(
                [(-57.070296946, -10.7230886944), (-52.259972646, -2.2909124977), (-35.3226625414, 6.5367565471), (-18.3853524367, 15.3644255919)],
                knots=[0.3481274936, 0.3481274936, 0.3481274936, 0.3481274936, 1, 1, 1, 1], degree=3))
            Line((-18.3853524367, 15.3644255919), (-65.7546722441, -0.6401843997))
        make_face()
        with BuildLine():
            Line((-57.070296946, -10.7230886944), (-61.8072289268, -12.3235496935))
            Line((-61.8072289268, -12.3235496935), (-57.8597856095, -24.0069149874))
            add(Edge.make_bspline(
                [(-57.8597856095, -24.0069149874), (-58.7494996077, -19.616571232), (-59.6392136059, -15.2262274766), (-57.070296946, -10.7230886944)],
                knots=[0, 0, 0, 0, 0.3481274936, 0.3481274936, 0.3481274936, 0.3481274936], degree=3))
        make_face()
    extrude(amount=-F25_DEPTH, mode=Mode.SUBTRACT)

    # F26 (on face) → F27 (join)
    with BuildSketch(Plane.XY.offset(20)):
        with BuildLine():
            ThreePointArc((10.8253174264, -6.2500002094), (12.0740727973, -3.2352381805), (12.5, 0))
            ThreePointArc((12.5, 0), (12.0740728368, 3.2352380332), (10.825317579, 6.2499999451))
            ThreePointArc((10.825317579, 6.2499999451), (6.2500000275, 10.8253175315), (0, 12.5))
            ThreePointArc((0, 12.5), (-6.2500001608, 10.8253174545), (-10.825317733, 6.2499996783))
            ThreePointArc((-10.825317733, 6.2499996783), (-12.5, -1.905e-07), (-10.8253175425, -6.2500000083))
            ThreePointArc((-10.8253175425, -6.2500000083), (-6.2499999958, -10.8253175497), (0, -12.5))
            ThreePointArc((0, -12.5), (6.2499998953, -10.8253176077), (10.8253174264, -6.2500002094))
        make_face()
    extrude(amount=F27_DEPTH)

    # F28 (radius 5 in the source; OpenCascade refuses exactly that, so slightly less here)
    f28_edges = [f1.edges().sort_by_distance(p)[0] for p in [
        (10.825318, 6.25, 25),
    ]]
    fillet(f28_edges, radius=F28_R)

    # F29 (on face) → F30 (cut)
    with BuildSketch(Plane(origin=(0, 0, 0), x_dir=(1, 0, 0), z_dir=(0, 0, -1))):
        Circle(F29_R)
    extrude(amount=-F30_DEPTH, mode=Mode.SUBTRACT)


solid = f1.part
